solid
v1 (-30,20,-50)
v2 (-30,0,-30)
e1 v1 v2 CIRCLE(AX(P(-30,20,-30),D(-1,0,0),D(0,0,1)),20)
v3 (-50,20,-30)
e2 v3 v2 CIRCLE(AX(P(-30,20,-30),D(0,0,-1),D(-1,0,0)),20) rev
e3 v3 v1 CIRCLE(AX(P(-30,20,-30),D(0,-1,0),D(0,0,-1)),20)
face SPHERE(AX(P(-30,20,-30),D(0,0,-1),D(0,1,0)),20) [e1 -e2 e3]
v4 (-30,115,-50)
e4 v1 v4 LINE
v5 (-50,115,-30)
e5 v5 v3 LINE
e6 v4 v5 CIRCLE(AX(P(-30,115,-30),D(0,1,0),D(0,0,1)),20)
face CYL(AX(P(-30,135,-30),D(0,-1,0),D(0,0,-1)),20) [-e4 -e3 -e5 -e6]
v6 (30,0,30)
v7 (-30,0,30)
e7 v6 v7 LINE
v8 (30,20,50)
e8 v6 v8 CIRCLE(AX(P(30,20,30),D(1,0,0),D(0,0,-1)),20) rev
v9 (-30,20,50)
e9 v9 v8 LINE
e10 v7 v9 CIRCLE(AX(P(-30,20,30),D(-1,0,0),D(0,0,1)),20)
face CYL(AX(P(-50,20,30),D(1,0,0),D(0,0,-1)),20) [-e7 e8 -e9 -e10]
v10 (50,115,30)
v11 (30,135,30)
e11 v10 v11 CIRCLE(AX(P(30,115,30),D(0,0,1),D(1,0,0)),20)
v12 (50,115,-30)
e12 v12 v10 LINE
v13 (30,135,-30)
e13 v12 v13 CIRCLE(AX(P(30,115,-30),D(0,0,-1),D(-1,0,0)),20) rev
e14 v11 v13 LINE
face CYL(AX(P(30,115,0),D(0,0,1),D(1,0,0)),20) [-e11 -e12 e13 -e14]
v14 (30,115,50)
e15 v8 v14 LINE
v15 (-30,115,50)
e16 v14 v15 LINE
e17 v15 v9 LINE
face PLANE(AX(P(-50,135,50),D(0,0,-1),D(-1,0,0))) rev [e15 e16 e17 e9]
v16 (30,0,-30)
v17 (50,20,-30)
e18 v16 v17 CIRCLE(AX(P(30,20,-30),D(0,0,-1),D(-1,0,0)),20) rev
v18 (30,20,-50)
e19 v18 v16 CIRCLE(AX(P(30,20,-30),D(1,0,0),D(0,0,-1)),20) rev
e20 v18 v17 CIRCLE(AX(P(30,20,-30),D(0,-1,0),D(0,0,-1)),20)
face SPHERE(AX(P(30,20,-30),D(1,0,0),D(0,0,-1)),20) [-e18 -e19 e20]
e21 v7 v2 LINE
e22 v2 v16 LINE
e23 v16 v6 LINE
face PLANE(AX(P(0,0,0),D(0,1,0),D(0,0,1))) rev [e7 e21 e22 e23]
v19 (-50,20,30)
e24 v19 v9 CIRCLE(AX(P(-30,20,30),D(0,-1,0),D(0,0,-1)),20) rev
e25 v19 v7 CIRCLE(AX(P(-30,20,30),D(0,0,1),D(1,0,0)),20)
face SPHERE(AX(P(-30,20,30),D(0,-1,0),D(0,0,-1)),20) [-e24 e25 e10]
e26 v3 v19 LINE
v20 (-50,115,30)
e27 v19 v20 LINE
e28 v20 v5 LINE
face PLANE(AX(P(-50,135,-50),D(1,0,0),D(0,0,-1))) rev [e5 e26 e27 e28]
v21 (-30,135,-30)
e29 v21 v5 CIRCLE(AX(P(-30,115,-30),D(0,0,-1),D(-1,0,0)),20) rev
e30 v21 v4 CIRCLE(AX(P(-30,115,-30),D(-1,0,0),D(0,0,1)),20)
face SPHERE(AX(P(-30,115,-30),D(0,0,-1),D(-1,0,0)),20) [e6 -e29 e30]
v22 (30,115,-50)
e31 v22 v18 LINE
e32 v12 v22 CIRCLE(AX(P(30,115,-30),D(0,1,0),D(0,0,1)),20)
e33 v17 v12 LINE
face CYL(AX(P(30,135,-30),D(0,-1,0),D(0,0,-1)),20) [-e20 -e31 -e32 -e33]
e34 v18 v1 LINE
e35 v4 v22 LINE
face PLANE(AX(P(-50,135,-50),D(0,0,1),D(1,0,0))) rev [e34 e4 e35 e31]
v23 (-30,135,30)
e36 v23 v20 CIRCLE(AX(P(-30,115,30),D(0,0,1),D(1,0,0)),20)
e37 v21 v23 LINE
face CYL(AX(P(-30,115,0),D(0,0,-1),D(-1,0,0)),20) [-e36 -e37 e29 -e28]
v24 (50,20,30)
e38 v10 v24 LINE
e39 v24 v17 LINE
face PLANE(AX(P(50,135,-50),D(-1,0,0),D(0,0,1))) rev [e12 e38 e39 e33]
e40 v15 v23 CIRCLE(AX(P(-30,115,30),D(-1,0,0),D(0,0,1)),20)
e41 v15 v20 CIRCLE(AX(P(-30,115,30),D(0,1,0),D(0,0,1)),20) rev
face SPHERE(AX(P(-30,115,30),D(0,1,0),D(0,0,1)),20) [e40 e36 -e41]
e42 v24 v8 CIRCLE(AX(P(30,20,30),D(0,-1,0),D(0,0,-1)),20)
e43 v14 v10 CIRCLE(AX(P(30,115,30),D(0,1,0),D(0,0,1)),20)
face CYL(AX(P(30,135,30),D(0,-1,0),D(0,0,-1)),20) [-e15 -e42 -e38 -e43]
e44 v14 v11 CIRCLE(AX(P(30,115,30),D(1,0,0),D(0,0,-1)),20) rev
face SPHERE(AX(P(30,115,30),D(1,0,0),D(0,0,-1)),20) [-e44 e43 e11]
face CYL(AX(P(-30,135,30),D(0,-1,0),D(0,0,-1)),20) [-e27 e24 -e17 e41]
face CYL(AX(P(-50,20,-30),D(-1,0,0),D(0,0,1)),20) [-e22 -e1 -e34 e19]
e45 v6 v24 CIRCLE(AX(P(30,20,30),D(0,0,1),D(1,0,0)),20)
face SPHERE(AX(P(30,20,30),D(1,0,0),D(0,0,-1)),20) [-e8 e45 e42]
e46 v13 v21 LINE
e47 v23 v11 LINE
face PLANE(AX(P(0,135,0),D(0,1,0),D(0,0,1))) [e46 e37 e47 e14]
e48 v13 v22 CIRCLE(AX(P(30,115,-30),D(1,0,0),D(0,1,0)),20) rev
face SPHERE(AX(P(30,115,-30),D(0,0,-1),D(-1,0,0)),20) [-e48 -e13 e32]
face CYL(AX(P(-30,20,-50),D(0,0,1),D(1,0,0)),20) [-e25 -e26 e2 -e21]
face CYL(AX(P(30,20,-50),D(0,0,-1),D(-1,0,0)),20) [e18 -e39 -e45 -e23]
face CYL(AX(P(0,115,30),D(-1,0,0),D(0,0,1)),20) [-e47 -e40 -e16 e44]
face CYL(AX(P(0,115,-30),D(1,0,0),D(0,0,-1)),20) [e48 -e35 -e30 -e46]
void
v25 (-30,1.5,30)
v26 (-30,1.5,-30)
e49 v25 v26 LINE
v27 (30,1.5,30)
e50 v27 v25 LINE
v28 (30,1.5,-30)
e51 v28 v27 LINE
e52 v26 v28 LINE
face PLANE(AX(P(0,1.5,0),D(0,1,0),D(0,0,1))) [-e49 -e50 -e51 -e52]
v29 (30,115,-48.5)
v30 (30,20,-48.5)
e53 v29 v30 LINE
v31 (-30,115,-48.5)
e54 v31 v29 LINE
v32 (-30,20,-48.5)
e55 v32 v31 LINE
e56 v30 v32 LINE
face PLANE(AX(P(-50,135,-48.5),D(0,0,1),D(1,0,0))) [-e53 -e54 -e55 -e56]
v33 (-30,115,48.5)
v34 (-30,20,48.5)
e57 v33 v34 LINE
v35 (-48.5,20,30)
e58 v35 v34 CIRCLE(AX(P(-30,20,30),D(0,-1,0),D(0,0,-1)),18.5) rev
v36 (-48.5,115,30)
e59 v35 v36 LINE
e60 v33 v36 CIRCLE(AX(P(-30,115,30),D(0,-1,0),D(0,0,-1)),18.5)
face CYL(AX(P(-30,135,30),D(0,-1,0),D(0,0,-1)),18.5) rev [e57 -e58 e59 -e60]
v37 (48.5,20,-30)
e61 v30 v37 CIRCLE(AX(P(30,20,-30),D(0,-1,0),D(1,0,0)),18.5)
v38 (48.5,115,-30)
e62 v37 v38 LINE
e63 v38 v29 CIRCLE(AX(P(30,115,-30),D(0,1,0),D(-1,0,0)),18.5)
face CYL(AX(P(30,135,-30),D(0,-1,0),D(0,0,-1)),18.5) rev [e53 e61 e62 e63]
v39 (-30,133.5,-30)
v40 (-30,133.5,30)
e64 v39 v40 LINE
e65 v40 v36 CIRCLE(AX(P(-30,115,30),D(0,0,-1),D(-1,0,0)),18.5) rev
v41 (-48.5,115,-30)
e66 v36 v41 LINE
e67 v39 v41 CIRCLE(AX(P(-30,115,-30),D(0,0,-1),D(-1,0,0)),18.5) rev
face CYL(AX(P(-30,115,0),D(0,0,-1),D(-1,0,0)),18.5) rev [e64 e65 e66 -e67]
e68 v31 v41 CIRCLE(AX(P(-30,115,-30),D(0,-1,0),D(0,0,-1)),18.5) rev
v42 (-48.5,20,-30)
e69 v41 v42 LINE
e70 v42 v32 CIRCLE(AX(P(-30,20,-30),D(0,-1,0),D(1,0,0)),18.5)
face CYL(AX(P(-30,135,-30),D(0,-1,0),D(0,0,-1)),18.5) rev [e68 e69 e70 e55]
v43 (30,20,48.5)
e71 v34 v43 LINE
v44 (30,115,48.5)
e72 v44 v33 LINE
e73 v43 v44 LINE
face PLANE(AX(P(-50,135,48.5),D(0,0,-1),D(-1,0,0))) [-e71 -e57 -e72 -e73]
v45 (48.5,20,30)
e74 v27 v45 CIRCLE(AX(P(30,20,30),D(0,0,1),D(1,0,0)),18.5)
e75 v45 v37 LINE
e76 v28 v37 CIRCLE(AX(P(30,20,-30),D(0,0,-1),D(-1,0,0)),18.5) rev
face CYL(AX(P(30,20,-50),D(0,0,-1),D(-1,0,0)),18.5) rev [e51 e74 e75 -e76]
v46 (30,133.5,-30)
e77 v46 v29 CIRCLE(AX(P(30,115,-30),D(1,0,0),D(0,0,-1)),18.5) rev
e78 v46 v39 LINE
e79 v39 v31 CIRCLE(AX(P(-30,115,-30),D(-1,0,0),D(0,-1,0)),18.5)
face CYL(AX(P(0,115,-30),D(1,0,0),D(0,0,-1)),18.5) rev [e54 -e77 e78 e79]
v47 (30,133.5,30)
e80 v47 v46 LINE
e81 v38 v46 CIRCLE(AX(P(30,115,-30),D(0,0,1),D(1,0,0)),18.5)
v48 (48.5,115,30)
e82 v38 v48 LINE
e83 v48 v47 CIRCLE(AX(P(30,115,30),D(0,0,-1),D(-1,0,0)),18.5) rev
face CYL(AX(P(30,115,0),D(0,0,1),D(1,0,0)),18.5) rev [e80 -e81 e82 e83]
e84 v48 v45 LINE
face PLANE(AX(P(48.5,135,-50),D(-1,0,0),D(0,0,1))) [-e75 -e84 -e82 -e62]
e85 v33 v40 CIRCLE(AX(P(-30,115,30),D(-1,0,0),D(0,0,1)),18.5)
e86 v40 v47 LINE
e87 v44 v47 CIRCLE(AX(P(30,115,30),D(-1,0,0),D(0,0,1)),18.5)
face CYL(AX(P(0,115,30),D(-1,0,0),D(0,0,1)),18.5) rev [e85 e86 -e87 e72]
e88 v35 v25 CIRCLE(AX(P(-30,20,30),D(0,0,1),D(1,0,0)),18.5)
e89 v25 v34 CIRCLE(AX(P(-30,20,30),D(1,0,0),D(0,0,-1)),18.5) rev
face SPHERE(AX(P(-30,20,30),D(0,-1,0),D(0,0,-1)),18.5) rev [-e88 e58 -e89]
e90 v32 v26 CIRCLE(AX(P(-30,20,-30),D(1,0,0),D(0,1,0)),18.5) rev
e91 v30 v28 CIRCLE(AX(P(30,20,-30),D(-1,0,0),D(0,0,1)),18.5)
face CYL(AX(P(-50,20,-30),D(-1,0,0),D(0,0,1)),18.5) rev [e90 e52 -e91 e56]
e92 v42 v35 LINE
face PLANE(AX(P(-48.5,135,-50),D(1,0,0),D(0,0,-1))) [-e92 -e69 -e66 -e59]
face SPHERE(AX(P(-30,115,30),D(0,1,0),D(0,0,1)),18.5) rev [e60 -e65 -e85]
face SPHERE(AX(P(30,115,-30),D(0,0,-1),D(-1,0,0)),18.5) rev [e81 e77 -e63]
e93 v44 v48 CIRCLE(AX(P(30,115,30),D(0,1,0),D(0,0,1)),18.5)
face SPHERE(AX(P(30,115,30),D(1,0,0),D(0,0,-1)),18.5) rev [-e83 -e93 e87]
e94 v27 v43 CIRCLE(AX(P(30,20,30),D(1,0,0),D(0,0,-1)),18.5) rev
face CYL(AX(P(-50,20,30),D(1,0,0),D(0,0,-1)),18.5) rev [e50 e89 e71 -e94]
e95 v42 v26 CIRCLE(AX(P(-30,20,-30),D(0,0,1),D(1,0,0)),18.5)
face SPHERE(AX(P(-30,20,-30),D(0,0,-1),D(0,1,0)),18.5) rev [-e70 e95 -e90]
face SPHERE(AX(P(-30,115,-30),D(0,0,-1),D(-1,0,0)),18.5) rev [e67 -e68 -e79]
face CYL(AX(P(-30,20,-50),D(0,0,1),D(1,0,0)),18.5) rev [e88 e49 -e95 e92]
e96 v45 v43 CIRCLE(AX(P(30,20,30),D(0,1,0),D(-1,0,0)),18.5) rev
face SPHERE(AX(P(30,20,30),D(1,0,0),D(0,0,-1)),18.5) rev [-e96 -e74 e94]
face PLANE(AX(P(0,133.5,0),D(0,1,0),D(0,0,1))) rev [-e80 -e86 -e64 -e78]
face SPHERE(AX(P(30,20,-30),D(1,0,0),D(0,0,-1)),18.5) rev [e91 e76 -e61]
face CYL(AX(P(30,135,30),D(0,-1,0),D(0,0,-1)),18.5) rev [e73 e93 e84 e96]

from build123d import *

# Parameters (mm, degrees)
SKETCH1_W           = 100
SKETCH1_H           = 100
BOSS_EXTRUDE1_DEPTH = 135
FILLET1_R           = 20
SHELL1_T            = 1.5


with BuildPart() as part:
    # Sketch1 → Boss-Extrude1 (new body)
    with BuildSketch(Plane(origin=(0, 0, 0), x_dir=(1, 0, 0), z_dir=(0, 1, 0))):
        Rectangle(SKETCH1_W, SKETCH1_H)
    extrude(amount=BOSS_EXTRUDE1_DEPTH)

    # Fillet1
    fillet1_edges = [part.edges().sort_by_distance(p)[0] for p in [
        (50, 135, 0),
        (0, 135, -50),
        (-50, 135, 0),
        (0, 0, -50),
        (50, 0, 0),
        (0, 0, 50),
        (-50, 0, 0),
        (-50, 67.5, -50),
        (50, 67.5, -50),
        (50, 67.5, 50),
        (-50, 67.5, 50),
        (0, 135, 50),
    ]]
    fillet(fillet1_edges, radius=FILLET1_R)

    # Shell1 (no face opened: a closed hollow body)
    add(offset(amount=-SHELL1_T, mode=Mode.PRIVATE), mode=Mode.SUBTRACT)


solid = part.part
